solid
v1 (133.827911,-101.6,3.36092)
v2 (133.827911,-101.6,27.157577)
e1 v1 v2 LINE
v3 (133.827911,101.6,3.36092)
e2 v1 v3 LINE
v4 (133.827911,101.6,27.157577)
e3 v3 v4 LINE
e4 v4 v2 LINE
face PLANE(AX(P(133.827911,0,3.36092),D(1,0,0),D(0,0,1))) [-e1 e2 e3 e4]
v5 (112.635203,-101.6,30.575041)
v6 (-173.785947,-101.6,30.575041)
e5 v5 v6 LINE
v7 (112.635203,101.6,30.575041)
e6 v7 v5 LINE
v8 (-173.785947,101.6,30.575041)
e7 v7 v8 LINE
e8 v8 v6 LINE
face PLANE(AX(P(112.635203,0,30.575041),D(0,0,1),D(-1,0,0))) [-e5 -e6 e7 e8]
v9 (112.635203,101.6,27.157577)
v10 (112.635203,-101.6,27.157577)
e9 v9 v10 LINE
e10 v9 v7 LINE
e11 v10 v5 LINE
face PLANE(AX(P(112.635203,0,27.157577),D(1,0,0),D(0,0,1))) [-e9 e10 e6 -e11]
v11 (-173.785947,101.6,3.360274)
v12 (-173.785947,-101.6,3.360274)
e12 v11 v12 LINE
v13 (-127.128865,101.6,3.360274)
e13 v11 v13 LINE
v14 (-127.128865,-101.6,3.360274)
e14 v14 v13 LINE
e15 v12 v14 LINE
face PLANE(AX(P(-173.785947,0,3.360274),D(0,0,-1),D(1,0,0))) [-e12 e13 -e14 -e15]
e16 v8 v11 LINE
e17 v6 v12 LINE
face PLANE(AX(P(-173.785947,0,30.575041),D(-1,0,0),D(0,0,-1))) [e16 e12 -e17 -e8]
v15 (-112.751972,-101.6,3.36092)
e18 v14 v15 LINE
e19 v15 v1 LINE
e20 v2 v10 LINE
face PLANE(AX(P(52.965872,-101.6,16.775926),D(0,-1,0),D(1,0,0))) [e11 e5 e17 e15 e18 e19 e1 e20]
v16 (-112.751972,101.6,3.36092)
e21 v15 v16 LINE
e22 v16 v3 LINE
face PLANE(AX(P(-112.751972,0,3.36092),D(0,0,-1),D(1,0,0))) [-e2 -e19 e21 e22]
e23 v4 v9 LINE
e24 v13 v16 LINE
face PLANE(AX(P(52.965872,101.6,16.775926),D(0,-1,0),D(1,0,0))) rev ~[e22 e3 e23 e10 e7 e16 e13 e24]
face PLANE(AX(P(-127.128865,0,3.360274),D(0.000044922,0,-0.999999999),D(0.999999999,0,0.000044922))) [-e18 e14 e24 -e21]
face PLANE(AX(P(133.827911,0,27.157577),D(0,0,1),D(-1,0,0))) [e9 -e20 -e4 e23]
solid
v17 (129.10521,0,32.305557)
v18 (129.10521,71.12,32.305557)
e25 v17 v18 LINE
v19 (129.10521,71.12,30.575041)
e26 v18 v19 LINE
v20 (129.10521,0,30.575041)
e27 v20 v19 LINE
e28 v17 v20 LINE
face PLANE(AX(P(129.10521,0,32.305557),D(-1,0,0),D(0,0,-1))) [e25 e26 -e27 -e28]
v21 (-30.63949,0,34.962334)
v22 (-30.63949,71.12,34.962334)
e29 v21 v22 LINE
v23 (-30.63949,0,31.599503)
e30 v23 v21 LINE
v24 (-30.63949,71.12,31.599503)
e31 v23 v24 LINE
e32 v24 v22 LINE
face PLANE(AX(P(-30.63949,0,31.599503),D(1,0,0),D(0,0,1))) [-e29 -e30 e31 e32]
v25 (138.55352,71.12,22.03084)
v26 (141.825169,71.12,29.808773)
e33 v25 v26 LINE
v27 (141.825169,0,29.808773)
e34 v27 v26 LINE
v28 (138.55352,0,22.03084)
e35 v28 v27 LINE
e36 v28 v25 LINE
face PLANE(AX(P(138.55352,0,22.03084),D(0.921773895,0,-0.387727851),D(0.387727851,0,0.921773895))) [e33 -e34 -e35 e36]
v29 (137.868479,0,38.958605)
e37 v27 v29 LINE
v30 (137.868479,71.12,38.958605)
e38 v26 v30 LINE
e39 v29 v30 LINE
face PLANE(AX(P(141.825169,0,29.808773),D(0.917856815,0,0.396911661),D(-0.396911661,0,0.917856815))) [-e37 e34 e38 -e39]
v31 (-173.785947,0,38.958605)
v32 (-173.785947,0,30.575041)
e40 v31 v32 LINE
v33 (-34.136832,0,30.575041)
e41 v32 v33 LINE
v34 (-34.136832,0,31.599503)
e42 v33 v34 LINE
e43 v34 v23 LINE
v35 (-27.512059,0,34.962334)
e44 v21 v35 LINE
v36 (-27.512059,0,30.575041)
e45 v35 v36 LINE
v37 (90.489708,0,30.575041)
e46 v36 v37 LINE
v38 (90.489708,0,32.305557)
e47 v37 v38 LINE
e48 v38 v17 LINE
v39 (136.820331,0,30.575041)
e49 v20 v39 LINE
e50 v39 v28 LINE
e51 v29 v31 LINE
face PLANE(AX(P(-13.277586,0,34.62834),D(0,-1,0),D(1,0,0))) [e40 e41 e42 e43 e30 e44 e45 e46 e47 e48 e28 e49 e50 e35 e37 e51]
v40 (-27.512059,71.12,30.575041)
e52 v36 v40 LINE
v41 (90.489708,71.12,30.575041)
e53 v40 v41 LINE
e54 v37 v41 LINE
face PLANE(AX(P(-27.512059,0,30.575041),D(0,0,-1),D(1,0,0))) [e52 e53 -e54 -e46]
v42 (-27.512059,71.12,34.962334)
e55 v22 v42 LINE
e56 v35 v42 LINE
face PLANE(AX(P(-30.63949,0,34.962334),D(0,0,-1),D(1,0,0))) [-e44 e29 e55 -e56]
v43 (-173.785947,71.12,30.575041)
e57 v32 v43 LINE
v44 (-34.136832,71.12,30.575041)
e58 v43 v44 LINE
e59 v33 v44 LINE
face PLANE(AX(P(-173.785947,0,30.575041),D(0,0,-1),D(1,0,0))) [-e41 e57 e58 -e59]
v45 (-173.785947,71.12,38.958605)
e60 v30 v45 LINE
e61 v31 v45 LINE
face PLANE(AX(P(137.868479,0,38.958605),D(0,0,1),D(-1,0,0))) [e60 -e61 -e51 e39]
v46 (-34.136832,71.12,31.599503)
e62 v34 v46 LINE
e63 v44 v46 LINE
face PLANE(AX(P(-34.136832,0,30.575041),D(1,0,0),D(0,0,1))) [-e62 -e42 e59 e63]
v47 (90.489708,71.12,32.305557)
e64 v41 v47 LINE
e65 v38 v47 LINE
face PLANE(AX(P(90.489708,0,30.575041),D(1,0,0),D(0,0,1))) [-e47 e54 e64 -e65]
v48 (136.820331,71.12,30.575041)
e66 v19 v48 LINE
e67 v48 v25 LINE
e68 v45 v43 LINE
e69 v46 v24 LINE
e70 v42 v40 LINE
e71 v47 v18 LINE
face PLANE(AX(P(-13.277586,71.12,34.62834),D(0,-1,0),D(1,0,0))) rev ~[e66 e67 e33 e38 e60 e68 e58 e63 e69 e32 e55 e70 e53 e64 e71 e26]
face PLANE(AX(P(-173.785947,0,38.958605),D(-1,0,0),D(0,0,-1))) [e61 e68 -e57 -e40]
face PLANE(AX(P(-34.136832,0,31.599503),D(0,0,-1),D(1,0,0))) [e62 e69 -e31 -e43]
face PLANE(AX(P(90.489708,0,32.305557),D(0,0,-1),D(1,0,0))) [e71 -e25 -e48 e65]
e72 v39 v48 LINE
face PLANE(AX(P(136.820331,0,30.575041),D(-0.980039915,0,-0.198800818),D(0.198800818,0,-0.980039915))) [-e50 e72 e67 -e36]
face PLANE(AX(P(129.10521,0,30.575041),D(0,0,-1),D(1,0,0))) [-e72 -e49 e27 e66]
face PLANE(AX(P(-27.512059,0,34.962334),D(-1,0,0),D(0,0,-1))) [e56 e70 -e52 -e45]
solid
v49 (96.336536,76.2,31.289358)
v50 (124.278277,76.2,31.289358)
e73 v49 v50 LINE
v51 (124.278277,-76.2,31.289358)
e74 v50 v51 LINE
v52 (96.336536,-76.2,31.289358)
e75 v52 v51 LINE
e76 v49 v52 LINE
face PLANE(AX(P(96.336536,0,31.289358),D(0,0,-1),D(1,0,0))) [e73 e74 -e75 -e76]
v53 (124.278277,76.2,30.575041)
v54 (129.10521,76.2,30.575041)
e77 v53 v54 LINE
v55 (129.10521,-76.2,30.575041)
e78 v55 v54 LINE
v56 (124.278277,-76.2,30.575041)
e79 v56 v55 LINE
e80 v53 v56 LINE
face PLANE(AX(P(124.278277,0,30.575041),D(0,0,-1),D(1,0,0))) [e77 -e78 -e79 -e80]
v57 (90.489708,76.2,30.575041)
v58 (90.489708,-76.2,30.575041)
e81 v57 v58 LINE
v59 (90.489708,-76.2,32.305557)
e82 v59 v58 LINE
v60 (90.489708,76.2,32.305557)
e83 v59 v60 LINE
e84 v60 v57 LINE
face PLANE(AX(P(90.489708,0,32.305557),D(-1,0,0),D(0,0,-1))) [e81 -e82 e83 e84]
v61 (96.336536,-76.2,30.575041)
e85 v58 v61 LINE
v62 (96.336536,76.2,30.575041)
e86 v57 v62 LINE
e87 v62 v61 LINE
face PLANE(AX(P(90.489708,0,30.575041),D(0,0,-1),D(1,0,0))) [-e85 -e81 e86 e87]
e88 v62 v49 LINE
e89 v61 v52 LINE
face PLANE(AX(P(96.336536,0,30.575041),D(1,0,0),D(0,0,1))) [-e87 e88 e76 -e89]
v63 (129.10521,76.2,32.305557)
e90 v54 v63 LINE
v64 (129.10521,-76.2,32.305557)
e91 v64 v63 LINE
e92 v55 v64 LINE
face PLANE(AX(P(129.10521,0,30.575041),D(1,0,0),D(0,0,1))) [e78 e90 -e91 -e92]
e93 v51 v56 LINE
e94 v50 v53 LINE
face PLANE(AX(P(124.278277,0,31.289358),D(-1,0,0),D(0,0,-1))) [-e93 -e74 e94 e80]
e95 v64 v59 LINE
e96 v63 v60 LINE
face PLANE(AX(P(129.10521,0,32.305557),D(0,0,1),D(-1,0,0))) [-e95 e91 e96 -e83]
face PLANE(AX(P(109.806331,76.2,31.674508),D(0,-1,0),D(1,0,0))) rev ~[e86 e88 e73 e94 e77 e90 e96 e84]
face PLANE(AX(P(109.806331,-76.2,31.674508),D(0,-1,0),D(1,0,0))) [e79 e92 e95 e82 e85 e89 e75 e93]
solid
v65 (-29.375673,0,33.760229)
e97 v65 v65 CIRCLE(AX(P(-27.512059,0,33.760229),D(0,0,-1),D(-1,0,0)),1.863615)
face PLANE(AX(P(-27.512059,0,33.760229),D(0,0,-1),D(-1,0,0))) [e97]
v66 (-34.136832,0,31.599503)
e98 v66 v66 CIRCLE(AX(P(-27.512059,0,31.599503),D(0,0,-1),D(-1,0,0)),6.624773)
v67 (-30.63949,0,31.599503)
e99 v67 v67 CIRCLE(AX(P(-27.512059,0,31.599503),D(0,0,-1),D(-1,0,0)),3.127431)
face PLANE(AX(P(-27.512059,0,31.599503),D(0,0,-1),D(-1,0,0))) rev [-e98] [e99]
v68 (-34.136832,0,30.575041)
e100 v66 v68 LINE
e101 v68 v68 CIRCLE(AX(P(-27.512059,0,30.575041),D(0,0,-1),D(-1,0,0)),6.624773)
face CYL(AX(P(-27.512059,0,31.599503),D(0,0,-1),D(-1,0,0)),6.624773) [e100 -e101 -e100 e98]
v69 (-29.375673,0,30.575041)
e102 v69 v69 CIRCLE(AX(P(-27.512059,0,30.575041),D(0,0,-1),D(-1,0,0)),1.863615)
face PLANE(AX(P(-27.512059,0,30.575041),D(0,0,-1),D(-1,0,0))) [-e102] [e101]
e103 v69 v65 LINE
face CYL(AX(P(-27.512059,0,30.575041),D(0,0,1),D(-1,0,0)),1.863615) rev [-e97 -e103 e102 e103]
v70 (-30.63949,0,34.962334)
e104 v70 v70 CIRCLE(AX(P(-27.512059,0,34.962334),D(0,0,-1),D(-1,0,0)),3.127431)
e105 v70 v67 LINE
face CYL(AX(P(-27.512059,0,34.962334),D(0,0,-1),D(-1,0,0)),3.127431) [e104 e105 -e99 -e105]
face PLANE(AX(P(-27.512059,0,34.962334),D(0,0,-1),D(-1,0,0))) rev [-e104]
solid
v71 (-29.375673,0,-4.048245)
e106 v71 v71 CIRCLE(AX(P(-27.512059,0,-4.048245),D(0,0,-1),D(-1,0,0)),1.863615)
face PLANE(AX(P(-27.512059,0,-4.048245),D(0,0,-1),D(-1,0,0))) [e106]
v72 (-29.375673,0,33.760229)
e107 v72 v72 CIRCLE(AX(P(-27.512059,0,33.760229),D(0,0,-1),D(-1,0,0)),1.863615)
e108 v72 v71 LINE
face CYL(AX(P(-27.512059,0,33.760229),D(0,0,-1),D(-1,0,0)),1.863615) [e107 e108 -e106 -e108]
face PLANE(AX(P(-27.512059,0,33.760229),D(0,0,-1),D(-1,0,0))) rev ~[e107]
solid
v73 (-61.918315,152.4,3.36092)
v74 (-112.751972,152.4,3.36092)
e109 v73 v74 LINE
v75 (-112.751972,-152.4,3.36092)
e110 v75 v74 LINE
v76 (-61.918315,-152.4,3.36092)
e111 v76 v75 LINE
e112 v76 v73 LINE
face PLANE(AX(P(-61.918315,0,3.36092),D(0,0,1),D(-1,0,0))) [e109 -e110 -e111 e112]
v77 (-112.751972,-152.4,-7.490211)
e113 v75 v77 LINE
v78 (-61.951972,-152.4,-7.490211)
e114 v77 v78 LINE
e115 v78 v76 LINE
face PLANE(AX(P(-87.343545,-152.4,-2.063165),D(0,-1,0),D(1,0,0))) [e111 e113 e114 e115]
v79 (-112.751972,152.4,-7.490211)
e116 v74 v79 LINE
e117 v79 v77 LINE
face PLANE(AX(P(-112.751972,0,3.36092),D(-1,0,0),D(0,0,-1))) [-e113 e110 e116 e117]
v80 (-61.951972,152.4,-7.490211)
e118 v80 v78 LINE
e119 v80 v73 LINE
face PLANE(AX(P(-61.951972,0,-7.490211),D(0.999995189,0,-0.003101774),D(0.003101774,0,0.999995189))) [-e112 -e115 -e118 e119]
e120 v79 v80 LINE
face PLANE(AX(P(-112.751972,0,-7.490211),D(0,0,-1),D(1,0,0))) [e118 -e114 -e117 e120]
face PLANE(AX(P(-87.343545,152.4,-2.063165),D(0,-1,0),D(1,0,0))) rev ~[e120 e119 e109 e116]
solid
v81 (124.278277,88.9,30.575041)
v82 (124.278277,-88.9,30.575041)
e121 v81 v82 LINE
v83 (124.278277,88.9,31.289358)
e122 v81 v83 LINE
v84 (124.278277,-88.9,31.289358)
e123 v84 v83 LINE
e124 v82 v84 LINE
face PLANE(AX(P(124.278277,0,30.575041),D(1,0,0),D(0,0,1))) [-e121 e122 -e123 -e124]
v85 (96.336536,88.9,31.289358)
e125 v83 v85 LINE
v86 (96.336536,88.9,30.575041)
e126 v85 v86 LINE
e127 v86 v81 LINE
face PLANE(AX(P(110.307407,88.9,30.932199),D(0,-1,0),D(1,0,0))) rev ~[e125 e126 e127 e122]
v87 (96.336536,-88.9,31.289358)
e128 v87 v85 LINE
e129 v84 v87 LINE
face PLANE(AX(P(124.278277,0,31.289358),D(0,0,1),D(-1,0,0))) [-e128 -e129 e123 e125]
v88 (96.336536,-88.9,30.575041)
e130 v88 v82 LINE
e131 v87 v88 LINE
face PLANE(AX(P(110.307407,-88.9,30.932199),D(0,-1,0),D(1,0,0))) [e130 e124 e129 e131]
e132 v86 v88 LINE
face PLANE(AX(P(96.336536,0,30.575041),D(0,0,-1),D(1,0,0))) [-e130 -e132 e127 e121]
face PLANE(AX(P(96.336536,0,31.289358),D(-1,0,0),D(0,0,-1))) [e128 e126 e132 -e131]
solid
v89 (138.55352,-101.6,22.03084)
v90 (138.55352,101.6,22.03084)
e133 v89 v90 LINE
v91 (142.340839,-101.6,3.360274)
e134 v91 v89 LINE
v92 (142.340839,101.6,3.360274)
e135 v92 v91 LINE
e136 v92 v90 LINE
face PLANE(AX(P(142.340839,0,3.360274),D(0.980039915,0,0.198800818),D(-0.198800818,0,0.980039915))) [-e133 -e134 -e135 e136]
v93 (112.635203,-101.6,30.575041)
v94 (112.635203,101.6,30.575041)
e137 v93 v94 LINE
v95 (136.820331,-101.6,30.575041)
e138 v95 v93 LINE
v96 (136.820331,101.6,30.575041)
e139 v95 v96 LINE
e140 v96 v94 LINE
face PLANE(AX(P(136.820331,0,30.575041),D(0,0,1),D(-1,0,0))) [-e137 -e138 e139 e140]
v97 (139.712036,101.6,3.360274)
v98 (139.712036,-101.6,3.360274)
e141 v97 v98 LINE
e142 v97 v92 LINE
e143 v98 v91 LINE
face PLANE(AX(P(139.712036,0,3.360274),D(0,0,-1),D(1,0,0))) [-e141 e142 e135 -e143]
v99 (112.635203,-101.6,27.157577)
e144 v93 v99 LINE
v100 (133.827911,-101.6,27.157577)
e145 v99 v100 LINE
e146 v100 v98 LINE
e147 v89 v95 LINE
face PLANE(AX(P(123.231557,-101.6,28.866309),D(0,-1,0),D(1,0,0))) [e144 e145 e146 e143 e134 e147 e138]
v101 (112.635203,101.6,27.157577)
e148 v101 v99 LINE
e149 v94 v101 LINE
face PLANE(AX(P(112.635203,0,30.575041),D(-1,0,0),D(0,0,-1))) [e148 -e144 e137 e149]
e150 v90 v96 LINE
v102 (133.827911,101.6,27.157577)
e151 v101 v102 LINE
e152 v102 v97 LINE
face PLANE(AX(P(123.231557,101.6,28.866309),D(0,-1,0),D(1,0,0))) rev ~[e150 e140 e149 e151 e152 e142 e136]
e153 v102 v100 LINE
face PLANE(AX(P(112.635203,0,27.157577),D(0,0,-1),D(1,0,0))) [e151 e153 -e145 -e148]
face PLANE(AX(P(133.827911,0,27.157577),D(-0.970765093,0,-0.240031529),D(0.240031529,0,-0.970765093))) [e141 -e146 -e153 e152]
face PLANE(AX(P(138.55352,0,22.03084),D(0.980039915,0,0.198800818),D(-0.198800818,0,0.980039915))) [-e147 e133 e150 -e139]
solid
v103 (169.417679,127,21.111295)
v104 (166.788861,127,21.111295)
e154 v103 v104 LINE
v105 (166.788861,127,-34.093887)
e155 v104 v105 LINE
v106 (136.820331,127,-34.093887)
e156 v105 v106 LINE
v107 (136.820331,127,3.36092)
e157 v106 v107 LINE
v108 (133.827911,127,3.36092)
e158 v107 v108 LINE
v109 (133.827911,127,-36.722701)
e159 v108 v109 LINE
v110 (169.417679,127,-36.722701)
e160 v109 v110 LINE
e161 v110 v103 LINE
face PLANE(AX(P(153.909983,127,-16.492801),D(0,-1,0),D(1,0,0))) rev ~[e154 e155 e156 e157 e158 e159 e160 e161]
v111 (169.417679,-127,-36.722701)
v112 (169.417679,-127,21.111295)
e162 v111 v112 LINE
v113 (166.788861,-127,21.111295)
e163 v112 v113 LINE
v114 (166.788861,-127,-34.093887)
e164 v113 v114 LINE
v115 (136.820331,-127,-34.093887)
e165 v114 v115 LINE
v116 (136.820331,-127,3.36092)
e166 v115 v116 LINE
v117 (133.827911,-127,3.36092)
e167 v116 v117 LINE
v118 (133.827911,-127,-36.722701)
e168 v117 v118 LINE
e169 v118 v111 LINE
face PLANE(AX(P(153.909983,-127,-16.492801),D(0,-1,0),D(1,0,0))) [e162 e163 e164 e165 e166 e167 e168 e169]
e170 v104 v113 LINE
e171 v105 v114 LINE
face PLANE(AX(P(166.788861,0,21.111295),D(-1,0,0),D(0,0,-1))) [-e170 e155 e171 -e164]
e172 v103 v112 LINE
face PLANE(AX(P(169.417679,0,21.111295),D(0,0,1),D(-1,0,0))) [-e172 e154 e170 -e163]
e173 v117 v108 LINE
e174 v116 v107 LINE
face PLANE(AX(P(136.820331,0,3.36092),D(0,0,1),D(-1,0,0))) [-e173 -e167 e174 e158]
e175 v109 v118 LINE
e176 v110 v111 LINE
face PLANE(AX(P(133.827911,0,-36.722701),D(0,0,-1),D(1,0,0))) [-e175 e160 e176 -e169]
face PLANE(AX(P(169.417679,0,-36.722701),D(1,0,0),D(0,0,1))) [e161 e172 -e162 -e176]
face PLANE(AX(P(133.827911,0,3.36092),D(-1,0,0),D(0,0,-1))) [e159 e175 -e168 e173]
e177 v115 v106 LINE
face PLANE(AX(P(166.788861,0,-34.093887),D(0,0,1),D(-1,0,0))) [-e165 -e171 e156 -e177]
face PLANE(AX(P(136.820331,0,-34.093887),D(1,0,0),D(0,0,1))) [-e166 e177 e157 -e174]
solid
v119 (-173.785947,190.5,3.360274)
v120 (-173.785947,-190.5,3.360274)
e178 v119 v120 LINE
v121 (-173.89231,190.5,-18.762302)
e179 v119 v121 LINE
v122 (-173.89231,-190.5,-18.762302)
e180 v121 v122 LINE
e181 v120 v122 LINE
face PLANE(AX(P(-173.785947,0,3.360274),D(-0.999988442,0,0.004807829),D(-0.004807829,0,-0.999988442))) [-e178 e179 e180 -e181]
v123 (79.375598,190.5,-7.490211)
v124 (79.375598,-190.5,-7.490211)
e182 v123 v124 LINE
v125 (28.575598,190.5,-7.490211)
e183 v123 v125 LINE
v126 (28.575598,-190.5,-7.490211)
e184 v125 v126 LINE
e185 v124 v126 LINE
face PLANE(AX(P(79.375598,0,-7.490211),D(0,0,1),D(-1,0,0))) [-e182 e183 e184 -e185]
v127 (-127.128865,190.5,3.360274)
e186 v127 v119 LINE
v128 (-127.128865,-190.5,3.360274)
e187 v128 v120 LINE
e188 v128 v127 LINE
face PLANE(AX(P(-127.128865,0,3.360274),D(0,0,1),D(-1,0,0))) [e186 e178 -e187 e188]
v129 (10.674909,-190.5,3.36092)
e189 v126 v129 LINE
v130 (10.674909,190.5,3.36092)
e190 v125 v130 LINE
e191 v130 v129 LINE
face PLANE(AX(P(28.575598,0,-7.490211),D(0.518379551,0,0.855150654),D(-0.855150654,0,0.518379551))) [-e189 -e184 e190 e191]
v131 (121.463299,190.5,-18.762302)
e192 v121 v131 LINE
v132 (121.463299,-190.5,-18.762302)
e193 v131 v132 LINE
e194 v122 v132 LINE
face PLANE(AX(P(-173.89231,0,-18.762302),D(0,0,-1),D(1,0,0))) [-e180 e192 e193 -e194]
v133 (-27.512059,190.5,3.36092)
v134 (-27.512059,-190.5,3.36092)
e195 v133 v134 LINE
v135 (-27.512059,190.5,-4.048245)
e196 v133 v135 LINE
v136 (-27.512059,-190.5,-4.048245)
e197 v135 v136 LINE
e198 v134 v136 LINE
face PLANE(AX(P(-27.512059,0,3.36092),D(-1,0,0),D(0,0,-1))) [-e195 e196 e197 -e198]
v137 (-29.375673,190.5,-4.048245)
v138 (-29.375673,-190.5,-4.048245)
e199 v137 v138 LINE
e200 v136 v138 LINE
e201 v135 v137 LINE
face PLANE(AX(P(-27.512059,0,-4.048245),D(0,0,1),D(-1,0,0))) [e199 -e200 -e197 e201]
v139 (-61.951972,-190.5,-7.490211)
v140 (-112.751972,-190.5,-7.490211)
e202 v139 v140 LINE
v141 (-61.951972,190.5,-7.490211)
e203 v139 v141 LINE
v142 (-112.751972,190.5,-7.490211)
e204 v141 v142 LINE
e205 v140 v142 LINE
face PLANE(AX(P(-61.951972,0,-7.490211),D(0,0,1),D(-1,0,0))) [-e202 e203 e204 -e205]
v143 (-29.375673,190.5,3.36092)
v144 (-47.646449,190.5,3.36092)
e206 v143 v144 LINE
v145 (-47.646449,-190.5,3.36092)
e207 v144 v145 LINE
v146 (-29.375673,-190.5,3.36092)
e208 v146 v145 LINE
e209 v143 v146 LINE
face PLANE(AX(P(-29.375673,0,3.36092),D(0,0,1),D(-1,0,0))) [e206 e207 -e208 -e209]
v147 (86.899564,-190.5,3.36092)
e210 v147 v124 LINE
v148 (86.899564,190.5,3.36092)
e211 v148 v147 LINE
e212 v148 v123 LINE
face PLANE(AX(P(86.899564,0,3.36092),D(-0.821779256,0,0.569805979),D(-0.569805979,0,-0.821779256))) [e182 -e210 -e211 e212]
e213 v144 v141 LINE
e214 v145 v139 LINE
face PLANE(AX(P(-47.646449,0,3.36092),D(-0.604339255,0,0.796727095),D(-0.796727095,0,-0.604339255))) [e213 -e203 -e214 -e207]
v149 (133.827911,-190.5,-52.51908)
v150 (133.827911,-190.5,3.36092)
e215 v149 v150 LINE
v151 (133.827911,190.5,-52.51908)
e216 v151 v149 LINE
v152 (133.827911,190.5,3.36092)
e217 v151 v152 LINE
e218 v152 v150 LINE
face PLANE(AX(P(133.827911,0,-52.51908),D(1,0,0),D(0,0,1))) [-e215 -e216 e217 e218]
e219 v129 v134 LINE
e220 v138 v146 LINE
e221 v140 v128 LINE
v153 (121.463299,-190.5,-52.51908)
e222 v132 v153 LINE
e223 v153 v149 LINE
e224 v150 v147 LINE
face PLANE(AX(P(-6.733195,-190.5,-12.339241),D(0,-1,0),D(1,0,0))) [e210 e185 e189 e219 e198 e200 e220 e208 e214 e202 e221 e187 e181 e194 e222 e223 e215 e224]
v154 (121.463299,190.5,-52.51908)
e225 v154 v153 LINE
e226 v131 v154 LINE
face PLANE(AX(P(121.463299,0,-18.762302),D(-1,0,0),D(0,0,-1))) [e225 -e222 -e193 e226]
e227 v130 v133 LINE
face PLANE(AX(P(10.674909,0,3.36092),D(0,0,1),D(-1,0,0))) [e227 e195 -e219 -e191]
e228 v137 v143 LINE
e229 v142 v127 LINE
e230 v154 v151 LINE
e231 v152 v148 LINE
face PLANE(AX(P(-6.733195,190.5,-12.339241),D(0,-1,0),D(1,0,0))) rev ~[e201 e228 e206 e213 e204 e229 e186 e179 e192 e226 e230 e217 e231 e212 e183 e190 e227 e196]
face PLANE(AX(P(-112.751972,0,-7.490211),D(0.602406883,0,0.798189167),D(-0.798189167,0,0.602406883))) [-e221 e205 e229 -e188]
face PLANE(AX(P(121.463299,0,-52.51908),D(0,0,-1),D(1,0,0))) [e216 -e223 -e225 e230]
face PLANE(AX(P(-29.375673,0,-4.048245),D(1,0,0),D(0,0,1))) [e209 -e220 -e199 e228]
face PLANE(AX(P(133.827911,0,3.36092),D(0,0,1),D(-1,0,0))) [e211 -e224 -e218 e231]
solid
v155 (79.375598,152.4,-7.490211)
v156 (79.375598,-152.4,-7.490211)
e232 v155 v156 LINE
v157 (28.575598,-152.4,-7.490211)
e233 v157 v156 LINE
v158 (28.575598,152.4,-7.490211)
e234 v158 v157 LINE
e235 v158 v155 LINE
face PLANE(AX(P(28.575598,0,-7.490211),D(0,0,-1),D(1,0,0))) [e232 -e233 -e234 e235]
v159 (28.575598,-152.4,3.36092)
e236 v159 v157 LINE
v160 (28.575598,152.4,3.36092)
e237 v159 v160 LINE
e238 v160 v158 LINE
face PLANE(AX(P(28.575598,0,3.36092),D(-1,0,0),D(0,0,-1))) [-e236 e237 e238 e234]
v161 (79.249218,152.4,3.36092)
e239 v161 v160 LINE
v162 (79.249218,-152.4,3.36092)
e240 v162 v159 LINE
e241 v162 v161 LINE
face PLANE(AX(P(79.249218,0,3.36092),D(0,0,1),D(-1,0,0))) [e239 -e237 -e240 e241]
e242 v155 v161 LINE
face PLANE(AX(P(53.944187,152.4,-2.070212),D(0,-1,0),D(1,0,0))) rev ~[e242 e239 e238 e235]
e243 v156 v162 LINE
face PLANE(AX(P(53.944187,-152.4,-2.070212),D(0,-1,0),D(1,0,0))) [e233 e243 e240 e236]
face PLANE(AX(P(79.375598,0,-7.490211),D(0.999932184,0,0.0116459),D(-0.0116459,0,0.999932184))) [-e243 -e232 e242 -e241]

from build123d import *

# Parameters (mm, degrees)
F1_DEPTH  = 190.5
F2_DEPTH  = 152.4
F0_W      = 1.8636145309
F0_H      = 27.2141208457
F3_DEPTH  = 101.6
F0_H_2    = 3.1851885769
F0_H_3    = 7.4091651964
F6_DEPTH  = 127
F7_DEPTH  = 101.6
F8_DEPTH  = 88.9
F9_DEPTH  = 76.2
F10_DEPTH = 71.12


with BuildPart() as f1:
    # F0 (on Front) → F1 (new body, symmetric)
    with BuildSketch(Plane.XZ):
        Polygon((-127.1288654061, 3.3602740393), (-173.7859473037, 3.3602740393), (-173.8923100857, -18.7623016536), (121.4632987976, -18.7623016536), (121.4632987976, -52.5190801178), (133.8279108456, -52.5190801178), (133.8279108456, -36.7227010429), (133.8279108456, 3.3609198822), (86.8995636396, 3.3609198822), (79.3755978542, -7.4902105568), (28.5755978542, -7.4902105568), (10.6749085502, 3.3609198822), (-27.5120586157, 3.3609198822), (-27.5120586157, -4.0482453142), (-29.3756731466, -4.0482453142), (-29.3756731466, 3.3609198822), (-47.6464486061, 3.3609198822), (-61.951972467, -7.4902105568), (-112.751972467, -7.4902105568), align=None)
    extrude(amount=F1_DEPTH, both=True)


with BuildPart() as f2:
    # F0 (on Front) → F2 (new body, symmetric)
    with BuildSketch(Plane.XZ):
        Polygon((-112.751972467, 3.3609198822), (-112.751972467, -7.4902105568), (-61.951972467, -7.4902105568), (-61.9183145463, 3.3609198822), align=None)
    extrude(amount=F2_DEPTH, both=True)


with BuildPart() as f2b:
    # F0 (on Front) → F2, piece 2 (new body, symmetric)
    with BuildSketch(Plane.XZ):
        Polygon((28.5755978542, 3.3609198822), (28.5755978542, -7.4902105568), (79.3755978542, -7.4902105568), (79.2492181063, 3.3609198822), align=None)
    extrude(amount=F2_DEPTH, both=True)


with BuildPart() as f3:
    # F0 (on Front) → F3 (new body, symmetric)
    with BuildSketch(Plane.XZ):
        Polygon((90.4897078872, 30.5750407279), (-27.5120586157, 30.5750407279), (-27.5120586157, 3.3609198822), (10.6749085502, 3.3609198822), (28.5755978542, 3.3609198822), (79.2492181063, 3.3609198822), (86.8995636396, 3.3609198822), (133.8279108456, 3.3609198822), (133.8279108456, 27.1575767547), (112.6352027059, 27.1575767547), (112.6352027059, 30.5750407279), (96.3365361094, 30.5750407279), align=None)
        Polygon((-173.7859473037, 30.5750407279), (-173.7859473037, 3.3602740393), (-127.1288654061, 3.3602740393), (-112.751972467, 3.3609198822), (-61.9183145463, 3.3609198822), (-47.6464486061, 3.3609198822), (-29.3756731466, 3.3609198822), (-29.3756731466, 30.5750407279), (-34.1368317604, 30.5750407279), align=None)
        with Locations((-28.4438658811, 16.967980305)):
            Rectangle(F0_W, F0_H)
    extrude(amount=F3_DEPTH, both=True)


with BuildPart() as f4:
    # F0 (on Front) → F4 (revolve)
    with BuildSketch(Plane.XZ):
        with Locations((-28.4438658811, 32.1676350163)):
            Rectangle(F0_W, F0_H_2)
        with Locations((-28.4438658811, 16.967980305)):
            Rectangle(F0_W, F0_H)
        with Locations((-28.4438658811, -0.343662716)):
            Rectangle(F0_W, F0_H_3)
    revolve(axis=Axis((-27.5120586157, 0, 14.7883250342), (0, 0, -1)))


with BuildPart() as f5:
    # F0 (on Front) → F5 (revolve)
    with BuildSketch(Plane.XZ):
        Polygon((-34.1368317604, 31.5995030105), (-34.1368317604, 30.5750407279), (-29.3756731466, 30.5750407279), (-29.3756731466, 33.7602293047), (-27.5120586157, 33.7602293047), (-27.5120586157, 34.9623337388), (-30.6394901127, 34.9623337388), (-30.6394901127, 31.5995030105), align=None)
    revolve(axis=Axis((-27.5120586157, 0, 14.7883250342), (0, 0, -1)))


with BuildPart() as f6:
    # F0 (on Front) → F6 (new body, symmetric)
    with BuildSketch(Plane.XZ):
        Polygon((133.8279108456, 3.3609198822), (133.8279108456, -36.7227010429), (169.4176793098, -36.7227010429), (169.4176793098, 21.1112946272), (166.7888611555, 21.1112946272), (166.7888611555, -34.0938866138), (136.8203312159, -34.0938866138), (136.8203312159, 3.3609198822), align=None)
    extrude(amount=F6_DEPTH, both=True)


with BuildPart() as f7:
    # F0 (on Front) → F7 (new body, symmetric)
    with BuildSketch(Plane.XZ):
        Polygon((124.2782771587, 30.5750407279), (112.6352027059, 30.5750407279), (112.6352027059, 27.1575767547), (133.8279108456, 27.1575767547), (133.8279108456, 30.5750407279), (129.1052103043, 30.5750407279), align=None)
        Polygon((142.3408389091, 3.3602740393), (138.5535198667, 22.0308401975), (136.8203312159, 30.5750407279), (133.8279108456, 30.5750407279), (133.8279108456, 27.1575767547), (139.712035656, 3.3602740393), align=None)
    extrude(amount=F7_DEPTH, both=True)


with BuildPart() as f8:
    # F0 (on Front) → F8 (new body, symmetric)
    with BuildSketch(Plane.XZ):
        Polygon((96.3365361094, 31.289357692), (96.3365361094, 30.5750407279), (112.6352027059, 30.5750407279), (124.2782771587, 30.5750407279), (124.2782771587, 31.289357692), align=None)
    extrude(amount=F8_DEPTH, both=True)


with BuildPart() as f9:
    # F0 (on Front) → F9 (new body, symmetric)
    with BuildSketch(Plane.XZ):
        Polygon((90.4897078872, 32.3055572808), (90.4897078872, 30.5750407279), (96.3365361094, 30.5750407279), (96.3365361094, 31.289357692), (124.2782771587, 31.289357692), (124.2782771587, 30.5750407279), (129.1052103043, 30.5750407279), (129.1052103043, 32.3055572808), align=None)
    extrude(amount=F9_DEPTH, both=True)


with BuildPart() as f10:
    # F0 (on Front) → F10 (new body)
    with BuildSketch(Plane.XZ):
        Polygon((-173.7859473037, 38.9586053789), (-173.7859473037, 30.5750407279), (-34.1368317604, 30.5750407279), (-34.1368317604, 31.5995030105), (-30.6394901127, 31.5995030105), (-30.6394901127, 34.9623337388), (-27.5120586157, 34.9623337388), (-27.5120586157, 33.7602293047), (-27.5120586157, 30.5750407279), (90.4897078872, 30.5750407279), (90.4897078872, 32.3055572808), (129.1052103043, 32.3055572808), (129.1052103043, 30.5750407279), (133.8279108456, 30.5750407279), (136.8203312159, 30.5750407279), (138.5535198667, 22.0308401975), (141.8251693249, 29.8087727278), (137.8684788942, 38.9586053789), align=None)
    extrude(amount=-F10_DEPTH)


solid = Compound([f1.part, f2.part, f2b.part, f3.part, f4.part, f5.part, f6.part, f7.part, f8.part, f9.part, f10.part])
